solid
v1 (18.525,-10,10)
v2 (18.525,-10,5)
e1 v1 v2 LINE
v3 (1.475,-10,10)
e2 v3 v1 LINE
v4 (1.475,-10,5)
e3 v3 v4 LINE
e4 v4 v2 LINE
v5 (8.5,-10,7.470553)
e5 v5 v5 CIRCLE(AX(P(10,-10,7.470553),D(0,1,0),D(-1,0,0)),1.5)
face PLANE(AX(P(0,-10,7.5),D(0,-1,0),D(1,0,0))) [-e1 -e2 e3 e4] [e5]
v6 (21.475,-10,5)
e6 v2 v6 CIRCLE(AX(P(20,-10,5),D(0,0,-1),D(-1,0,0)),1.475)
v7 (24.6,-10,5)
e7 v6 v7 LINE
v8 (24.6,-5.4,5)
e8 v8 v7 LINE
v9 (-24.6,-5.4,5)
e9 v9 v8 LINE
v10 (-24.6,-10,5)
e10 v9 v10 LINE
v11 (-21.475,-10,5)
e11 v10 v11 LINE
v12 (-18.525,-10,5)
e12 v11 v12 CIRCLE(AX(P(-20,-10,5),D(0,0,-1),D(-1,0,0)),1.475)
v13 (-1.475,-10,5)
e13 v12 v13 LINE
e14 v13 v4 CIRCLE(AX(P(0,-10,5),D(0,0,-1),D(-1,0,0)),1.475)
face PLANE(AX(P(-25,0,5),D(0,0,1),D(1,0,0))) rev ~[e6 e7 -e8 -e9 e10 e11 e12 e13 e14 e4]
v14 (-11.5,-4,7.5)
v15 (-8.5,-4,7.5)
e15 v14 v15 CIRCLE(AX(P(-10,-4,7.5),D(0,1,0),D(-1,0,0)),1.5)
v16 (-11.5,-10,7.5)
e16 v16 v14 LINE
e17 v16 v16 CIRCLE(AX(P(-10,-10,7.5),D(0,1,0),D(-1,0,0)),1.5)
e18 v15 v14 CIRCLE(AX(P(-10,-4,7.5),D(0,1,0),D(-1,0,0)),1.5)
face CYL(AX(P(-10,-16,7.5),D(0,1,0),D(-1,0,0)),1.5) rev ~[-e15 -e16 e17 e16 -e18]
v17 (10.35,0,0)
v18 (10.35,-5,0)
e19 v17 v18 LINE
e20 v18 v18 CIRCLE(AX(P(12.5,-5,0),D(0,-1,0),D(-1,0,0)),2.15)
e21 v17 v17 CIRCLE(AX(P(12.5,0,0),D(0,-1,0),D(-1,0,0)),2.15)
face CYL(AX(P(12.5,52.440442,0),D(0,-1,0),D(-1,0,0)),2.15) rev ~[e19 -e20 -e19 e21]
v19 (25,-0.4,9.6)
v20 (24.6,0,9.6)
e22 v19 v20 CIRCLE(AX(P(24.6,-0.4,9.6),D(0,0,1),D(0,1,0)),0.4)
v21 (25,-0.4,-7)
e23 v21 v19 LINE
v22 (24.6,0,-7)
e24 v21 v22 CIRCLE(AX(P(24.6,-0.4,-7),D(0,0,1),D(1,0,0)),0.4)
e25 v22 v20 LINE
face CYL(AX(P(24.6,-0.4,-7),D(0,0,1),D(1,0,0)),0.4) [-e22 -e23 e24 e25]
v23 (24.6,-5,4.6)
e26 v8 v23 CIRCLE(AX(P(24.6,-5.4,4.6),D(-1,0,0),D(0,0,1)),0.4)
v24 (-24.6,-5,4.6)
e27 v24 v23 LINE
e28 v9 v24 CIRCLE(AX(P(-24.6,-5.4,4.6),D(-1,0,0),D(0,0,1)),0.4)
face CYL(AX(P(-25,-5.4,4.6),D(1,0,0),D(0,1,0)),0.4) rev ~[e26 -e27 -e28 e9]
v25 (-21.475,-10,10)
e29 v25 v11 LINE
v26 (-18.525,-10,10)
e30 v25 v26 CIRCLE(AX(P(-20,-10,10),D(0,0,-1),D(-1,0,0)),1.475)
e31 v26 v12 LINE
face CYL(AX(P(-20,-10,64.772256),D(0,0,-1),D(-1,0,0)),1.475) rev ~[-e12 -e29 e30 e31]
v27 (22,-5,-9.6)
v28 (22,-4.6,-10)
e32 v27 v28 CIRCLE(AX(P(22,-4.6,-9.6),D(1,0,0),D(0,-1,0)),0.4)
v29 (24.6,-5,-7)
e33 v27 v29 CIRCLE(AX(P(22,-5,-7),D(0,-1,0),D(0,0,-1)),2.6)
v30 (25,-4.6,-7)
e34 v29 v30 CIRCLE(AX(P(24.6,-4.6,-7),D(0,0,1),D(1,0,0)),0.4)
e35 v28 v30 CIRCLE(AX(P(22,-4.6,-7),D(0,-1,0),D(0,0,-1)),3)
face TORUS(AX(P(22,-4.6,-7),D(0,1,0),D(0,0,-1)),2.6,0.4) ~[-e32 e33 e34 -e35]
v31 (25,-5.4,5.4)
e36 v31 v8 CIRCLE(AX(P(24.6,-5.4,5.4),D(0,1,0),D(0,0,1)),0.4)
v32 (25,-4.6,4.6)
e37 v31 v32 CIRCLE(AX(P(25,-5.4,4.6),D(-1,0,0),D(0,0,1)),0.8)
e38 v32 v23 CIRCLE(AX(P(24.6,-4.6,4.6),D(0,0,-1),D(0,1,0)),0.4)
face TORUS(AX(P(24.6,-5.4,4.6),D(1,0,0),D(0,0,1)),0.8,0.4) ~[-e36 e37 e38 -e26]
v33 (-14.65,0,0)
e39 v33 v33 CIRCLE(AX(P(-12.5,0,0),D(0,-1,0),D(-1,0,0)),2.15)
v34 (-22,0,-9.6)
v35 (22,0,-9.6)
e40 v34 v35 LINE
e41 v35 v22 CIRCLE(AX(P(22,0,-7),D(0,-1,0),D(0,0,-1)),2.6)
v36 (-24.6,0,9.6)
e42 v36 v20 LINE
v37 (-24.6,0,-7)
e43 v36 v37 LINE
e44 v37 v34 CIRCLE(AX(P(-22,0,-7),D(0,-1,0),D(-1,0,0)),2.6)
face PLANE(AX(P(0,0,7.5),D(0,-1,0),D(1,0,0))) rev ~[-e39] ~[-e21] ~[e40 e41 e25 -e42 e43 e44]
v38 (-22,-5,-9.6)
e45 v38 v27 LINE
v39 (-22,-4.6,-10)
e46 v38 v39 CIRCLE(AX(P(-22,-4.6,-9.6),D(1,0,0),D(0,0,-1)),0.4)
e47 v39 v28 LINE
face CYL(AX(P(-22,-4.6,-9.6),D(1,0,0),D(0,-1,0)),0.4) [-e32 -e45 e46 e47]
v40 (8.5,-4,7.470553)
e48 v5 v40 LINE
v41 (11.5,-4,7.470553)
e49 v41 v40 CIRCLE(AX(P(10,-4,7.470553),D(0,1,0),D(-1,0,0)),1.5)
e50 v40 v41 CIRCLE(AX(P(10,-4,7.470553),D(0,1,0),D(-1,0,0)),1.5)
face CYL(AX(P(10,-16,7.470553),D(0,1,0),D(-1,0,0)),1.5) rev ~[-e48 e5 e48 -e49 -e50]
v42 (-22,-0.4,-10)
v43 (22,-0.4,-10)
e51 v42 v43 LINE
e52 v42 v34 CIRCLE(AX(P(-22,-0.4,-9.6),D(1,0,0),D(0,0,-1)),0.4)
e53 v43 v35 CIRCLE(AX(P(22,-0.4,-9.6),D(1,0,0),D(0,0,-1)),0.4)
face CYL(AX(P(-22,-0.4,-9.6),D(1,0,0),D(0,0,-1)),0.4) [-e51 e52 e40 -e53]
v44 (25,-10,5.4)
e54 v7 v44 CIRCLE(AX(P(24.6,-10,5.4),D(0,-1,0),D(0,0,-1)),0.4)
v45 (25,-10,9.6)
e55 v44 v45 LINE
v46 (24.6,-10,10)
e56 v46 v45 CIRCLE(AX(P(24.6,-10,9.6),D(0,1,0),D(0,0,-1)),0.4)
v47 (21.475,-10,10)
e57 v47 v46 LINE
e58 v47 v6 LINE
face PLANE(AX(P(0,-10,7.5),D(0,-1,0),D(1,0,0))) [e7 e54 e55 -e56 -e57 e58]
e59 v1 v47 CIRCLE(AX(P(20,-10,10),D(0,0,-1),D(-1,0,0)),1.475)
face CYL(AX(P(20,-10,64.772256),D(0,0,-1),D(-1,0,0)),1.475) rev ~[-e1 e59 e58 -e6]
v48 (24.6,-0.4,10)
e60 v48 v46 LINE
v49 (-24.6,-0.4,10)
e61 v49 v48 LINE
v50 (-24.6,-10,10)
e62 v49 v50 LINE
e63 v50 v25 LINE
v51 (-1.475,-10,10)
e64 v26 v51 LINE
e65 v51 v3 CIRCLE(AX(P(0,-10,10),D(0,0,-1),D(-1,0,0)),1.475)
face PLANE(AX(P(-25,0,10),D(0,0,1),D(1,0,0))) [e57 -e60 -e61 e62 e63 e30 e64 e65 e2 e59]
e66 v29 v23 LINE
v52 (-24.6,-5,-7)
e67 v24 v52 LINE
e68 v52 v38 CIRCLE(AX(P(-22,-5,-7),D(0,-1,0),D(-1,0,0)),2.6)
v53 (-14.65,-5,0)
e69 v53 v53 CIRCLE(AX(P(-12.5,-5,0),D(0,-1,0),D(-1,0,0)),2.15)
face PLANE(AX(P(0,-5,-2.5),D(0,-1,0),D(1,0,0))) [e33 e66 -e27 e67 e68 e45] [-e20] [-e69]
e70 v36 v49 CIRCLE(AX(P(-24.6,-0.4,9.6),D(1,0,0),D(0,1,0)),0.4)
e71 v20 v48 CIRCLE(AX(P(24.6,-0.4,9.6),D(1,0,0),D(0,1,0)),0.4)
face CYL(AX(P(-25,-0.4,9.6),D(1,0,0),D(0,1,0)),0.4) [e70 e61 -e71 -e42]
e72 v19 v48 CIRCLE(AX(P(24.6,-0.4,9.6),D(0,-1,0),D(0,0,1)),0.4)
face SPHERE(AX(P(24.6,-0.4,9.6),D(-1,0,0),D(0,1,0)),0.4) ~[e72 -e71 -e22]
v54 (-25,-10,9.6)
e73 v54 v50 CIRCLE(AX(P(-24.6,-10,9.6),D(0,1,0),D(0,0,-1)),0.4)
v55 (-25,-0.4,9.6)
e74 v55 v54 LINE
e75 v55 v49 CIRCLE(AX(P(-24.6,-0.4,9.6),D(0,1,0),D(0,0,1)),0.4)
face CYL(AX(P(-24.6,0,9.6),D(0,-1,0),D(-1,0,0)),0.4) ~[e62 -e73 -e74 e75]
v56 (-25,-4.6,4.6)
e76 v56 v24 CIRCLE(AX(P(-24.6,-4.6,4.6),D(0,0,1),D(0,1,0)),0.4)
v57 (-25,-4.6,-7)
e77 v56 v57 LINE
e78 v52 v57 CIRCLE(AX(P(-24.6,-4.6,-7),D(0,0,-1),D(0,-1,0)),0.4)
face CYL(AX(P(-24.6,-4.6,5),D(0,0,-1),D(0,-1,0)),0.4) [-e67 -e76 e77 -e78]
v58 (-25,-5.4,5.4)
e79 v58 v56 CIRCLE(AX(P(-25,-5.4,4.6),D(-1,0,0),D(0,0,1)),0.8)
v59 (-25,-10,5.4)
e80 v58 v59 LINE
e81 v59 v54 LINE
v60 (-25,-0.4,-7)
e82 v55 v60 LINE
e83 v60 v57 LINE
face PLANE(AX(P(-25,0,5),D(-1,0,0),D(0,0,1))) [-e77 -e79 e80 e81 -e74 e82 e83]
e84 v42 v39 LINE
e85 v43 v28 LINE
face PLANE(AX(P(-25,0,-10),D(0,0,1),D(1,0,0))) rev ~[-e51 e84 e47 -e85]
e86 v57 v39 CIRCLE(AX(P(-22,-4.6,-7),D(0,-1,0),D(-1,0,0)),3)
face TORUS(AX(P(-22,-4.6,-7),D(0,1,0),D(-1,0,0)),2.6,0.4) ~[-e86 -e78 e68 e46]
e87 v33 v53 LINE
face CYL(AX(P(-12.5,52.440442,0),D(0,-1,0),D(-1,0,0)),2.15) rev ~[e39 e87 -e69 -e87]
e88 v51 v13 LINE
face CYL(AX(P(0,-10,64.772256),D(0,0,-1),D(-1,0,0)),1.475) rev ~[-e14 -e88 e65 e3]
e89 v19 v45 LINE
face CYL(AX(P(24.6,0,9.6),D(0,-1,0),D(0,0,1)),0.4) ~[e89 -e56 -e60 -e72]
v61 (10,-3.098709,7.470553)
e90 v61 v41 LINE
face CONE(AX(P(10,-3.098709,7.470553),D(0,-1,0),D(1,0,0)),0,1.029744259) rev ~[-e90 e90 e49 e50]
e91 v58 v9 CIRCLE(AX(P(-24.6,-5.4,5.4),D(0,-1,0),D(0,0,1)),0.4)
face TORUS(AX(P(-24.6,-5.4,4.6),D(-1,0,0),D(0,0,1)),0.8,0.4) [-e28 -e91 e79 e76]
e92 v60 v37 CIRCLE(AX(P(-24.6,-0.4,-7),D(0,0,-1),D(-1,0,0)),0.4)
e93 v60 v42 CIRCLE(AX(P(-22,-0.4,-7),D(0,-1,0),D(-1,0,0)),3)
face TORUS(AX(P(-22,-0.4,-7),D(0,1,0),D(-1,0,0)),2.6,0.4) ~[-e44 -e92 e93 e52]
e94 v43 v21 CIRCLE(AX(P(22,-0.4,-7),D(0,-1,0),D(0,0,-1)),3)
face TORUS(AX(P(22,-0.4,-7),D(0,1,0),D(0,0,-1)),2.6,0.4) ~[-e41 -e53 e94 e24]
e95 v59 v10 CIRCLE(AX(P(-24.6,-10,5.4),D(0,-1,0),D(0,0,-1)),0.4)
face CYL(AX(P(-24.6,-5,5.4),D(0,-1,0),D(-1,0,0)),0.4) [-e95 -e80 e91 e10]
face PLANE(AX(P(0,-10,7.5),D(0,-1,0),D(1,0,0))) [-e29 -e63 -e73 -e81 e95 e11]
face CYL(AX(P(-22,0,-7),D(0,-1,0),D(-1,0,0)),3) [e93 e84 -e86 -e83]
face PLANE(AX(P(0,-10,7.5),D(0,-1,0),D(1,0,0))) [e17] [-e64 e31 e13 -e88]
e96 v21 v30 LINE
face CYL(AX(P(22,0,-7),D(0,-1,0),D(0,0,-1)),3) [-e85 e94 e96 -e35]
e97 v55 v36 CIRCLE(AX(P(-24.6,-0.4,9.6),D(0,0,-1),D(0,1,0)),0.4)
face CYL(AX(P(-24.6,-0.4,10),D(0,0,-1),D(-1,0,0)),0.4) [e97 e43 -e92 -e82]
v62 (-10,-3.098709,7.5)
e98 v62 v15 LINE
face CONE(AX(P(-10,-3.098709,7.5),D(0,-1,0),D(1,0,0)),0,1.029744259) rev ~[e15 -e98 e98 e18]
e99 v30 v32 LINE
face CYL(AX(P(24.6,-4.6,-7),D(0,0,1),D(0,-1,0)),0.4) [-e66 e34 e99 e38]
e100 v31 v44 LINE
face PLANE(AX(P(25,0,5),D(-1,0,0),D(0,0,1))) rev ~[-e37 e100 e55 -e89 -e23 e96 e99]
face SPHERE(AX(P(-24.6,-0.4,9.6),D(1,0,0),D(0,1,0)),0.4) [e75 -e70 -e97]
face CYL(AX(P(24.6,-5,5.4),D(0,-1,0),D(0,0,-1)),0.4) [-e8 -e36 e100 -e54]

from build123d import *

# Parameters (mm, degrees)
F0_W     = 50
F0_H     = 15
F1_DEPTH = 5
F2_D     = 4.3
F0_H_2   = 5
F3_DEPTH = 10
F5_D     = 2.95
F6_R     = 3
F7_R     = 0.4
F9_D     = 3
F9_DEPTH = 6
F9_TIP   = 0.9012909285


with BuildPart() as f1:
    # F0 (on Front) → F1 (new body)
    with BuildSketch(Plane.XZ):
        with Locations((0, -2.5)):
            Rectangle(F0_W, F0_H)
    extrude(amount=F1_DEPTH)

    # F2 (through all)
    with Locations(Plane(origin=(0, 0, 0), x_dir=(1, 0, 0), z_dir=(0, 1, 0))):
        with Locations((12.5, 0), (-12.5, 0)):
            Hole(F2_D / 2)

    # F0 (on Front) → F3 (join)
    with BuildSketch(Plane.XZ):
        with Locations((0, 7.5)):
            Rectangle(F0_W, F0_H_2)
    extrude(amount=F3_DEPTH)

    # F5 (through all)
    with Locations(Plane.XY.offset(10)):
        with Locations((-20, -10), (0, -10), (20, -10)):
            Hole(F5_D / 2)

    # F6
    f6_edges = [f1.edges().sort_by_distance(p)[0] for p in [
        (-25, -2.5, -10),
        (25, -2.5, -10),
    ]]
    fillet(f6_edges, radius=F6_R)

    # F7
    f7_edges = [f1.edges().sort_by_distance(p)[0] for p in [
        (0, 0, 10),
        (-25, 0, 1.5),
        (-25, -5, 10),
        (25, -5, 10),
        (0, -5, -10),
        (0, -5, 5),
        (25, -5, -1),
        (25, -7.5, 5),
        (25, 0, 1.5),
        (24.12132, -5, -9.12132),
        (-25, -5, -1),
        (-24.12132, -5, -9.12132),
        (24.12132, 0, -9.12132),
        (-25, -7.5, 5),
        (0, 0, -10),
        (-24.12132, 0, -9.12132),
    ]]
    fillet(f7_edges, radius=F7_R)

    # F9
    with Locations(Plane.XZ.offset(10)):
        with Locations((-10, 7.5), (10, 7.4705528095)):
            Hole(F9_D / 2, depth=F9_DEPTH)
            with Locations((0, 0, -(F9_DEPTH + F9_TIP / 2))):  # 118° drill point
                Cone(0, F9_D / 2, F9_TIP, mode=Mode.SUBTRACT)


solid = f1.part
